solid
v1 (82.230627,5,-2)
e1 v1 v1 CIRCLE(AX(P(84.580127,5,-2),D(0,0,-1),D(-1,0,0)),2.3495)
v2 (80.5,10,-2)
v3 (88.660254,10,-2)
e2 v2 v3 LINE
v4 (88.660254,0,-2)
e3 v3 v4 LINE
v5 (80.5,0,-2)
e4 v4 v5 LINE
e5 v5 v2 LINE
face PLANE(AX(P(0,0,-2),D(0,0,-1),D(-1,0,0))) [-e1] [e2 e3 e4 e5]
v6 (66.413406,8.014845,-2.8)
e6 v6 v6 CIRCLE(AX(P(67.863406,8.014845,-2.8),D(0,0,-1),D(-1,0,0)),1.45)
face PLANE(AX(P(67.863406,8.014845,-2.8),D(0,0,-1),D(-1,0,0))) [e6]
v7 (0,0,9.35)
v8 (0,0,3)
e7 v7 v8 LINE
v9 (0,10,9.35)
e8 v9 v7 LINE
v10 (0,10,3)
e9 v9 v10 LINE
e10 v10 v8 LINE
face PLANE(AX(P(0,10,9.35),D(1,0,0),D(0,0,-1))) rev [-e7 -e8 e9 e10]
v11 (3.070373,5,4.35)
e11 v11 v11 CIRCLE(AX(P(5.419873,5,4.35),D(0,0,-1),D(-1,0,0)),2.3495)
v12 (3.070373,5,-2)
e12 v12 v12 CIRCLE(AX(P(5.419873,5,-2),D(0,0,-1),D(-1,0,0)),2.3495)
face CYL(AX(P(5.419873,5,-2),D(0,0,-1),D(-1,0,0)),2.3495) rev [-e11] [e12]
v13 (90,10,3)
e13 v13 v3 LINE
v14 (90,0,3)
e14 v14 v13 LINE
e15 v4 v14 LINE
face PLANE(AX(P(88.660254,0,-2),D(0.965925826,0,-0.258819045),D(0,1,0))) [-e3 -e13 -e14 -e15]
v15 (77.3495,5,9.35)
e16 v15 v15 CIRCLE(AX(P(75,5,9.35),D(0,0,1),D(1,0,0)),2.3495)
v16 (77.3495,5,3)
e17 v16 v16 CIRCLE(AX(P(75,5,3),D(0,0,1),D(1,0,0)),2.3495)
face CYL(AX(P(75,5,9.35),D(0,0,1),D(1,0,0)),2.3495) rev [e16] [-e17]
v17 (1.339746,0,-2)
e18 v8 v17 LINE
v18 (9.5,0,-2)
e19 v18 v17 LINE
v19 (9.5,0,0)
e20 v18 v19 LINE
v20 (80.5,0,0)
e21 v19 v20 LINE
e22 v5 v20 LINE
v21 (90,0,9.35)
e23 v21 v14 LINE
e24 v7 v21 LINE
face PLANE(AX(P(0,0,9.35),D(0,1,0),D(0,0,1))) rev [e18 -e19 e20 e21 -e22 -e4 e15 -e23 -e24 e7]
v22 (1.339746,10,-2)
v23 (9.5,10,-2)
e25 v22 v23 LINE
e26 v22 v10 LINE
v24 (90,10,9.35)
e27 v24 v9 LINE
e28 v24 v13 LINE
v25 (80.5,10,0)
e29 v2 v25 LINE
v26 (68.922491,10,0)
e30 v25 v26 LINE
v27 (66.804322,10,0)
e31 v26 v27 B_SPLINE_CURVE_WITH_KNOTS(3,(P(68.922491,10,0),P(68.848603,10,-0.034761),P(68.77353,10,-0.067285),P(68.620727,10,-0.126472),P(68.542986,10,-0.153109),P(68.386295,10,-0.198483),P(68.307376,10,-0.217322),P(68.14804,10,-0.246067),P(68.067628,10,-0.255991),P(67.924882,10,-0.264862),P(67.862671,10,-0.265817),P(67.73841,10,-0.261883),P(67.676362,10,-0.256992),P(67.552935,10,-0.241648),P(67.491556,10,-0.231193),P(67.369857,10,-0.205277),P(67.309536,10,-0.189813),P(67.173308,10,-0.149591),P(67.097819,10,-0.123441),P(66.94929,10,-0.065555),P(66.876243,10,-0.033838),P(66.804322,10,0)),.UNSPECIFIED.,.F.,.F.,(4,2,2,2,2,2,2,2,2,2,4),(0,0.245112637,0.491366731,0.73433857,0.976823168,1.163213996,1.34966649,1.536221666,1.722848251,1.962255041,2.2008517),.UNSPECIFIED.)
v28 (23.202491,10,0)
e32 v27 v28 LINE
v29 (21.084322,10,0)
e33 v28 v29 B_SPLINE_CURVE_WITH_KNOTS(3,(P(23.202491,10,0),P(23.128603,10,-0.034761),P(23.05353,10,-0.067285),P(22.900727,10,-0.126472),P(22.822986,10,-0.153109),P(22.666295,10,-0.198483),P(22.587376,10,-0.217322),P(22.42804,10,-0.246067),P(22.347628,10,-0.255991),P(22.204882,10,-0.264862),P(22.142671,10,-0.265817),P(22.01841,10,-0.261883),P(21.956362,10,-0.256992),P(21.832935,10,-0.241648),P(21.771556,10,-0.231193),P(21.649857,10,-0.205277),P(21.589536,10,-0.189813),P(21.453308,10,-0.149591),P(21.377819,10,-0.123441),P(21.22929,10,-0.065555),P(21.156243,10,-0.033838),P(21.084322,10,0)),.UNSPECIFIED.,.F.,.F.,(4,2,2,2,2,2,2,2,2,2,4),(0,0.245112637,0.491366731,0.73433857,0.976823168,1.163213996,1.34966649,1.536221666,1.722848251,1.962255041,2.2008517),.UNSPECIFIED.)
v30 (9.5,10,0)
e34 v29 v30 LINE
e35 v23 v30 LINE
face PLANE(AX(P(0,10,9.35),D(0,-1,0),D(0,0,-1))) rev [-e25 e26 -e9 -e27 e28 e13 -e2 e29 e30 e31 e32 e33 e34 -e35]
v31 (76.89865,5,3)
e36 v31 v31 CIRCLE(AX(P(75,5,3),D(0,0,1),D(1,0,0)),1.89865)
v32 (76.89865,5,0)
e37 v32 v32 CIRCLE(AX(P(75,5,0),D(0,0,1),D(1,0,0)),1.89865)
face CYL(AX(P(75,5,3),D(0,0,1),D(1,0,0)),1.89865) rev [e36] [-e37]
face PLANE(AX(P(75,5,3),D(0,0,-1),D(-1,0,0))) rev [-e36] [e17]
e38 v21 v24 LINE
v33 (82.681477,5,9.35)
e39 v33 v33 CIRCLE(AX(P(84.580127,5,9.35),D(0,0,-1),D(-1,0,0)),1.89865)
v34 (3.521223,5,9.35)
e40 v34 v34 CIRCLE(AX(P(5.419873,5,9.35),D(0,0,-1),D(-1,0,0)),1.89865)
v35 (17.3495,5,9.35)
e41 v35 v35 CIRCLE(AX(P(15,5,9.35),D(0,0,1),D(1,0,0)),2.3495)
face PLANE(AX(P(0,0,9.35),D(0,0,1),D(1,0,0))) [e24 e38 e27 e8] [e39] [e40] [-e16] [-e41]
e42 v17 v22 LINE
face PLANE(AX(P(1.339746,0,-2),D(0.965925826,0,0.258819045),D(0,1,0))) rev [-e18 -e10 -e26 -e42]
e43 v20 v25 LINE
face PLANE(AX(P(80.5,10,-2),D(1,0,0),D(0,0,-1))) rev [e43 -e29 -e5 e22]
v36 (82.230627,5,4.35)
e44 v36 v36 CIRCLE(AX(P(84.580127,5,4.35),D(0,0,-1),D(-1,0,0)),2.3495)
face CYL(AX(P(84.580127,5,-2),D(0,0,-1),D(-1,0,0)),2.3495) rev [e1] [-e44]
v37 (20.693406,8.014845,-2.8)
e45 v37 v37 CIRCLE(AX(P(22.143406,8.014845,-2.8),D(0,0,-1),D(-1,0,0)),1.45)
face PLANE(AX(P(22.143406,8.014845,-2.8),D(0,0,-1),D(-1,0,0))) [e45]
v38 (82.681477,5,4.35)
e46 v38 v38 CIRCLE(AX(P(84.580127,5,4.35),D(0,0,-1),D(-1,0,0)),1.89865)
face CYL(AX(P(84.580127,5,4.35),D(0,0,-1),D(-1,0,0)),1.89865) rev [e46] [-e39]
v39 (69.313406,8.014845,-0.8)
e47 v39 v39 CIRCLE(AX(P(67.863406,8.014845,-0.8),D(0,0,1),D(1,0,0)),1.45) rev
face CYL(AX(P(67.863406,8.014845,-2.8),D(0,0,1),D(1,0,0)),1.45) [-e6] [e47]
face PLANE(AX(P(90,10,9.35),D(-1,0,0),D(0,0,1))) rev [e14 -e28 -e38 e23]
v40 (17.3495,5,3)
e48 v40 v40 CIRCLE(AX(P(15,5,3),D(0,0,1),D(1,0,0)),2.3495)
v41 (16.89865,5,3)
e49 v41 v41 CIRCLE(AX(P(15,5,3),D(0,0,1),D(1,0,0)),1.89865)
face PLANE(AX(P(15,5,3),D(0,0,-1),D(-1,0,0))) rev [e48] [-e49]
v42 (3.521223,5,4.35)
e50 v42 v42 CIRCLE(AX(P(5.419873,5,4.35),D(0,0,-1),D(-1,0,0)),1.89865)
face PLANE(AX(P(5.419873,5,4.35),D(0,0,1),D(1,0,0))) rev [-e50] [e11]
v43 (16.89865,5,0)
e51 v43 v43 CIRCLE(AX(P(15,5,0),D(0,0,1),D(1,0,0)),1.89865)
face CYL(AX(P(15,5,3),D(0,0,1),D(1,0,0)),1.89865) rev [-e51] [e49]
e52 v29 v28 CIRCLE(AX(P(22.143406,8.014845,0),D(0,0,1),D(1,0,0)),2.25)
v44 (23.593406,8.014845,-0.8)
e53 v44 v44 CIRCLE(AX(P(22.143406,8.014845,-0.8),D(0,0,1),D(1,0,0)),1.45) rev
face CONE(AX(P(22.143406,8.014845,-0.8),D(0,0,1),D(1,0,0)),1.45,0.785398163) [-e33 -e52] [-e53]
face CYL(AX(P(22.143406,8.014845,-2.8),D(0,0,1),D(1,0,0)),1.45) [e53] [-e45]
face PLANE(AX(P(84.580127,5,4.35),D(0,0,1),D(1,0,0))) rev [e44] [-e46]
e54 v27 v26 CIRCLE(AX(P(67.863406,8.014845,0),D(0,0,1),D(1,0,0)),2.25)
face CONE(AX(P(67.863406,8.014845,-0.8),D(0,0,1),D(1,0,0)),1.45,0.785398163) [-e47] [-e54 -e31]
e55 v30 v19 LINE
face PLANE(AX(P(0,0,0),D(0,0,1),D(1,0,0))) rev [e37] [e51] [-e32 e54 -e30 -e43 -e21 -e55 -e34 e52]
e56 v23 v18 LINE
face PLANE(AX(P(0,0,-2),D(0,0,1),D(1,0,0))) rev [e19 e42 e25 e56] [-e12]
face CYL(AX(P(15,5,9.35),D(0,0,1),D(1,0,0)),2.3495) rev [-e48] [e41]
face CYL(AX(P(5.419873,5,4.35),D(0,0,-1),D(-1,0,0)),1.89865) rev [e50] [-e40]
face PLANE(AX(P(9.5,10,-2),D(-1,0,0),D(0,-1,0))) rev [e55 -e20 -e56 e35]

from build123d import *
from OCP.BRepFilletAPI import BRepFilletAPI_MakeChamfer

# Parameters (mm, degrees)
SKETCH2_W                       = 90
SKETCH2_H                       = 10
BOSS_EXTRUDE1_DEPTH             = 9.35
SKETCH4_W                       = 9.5
SKETCH4_H                       = 10
BOSS_EXTRUDE2_DEPTH             = 2
SKETCH5_R                       = 1.45
BOSS_EXTRUDE3_DEPTH             = 2.8
CHAMFER1_SIZE                   = 0.8
CHAMFER2_SIZE                   = 5
CHAMFER2_SIZE2                  = 1.339745962
F_13_0_185_DIAMETER_HOLE1_D     = 4.699
F_13_0_185_DIAMETER_HOLE1_DEPTH = 6.35
F_6_CLEARANCE_HOLE1_D           = 3.7973
F_6_CLEARANCE_HOLE1_ON_FACE_2_D = 3.7973
F_13_0_185_DIAMETER_HOLE2_D     = 4.699
F_13_0_185_DIAMETER_HOLE2_DEPTH = 6.35
F_6_CLEARANCE_HOLE2_D           = 3.7973


with BuildPart() as part:
    # Sketch2 → Boss-Extrude1 (new body)
    with BuildSketch(Plane.XY):
        with Locations((45, 5)):
            Rectangle(SKETCH2_W, SKETCH2_H)
    extrude(amount=BOSS_EXTRUDE1_DEPTH)

    # Sketch4 → Boss-Extrude2 (add)
    with BuildSketch(Plane(origin=(0, 0, 0), x_dir=(-1, 0, 0), z_dir=(0, 0, -1))):
        with Locations((-4.75, 5)):
            Rectangle(SKETCH4_W, SKETCH4_H)
        with Locations((-85.25, 5)):
            Rectangle(SKETCH4_W, SKETCH4_H)
    extrude(amount=BOSS_EXTRUDE2_DEPTH)

    # Sketch5 → Boss-Extrude3 (add)
    with BuildSketch(Plane(origin=(0, 0, 0), x_dir=(-1, 0, 0), z_dir=(0, 0, -1))):
        with Locations(Location((-67.863406388, 8.0148451, 0), (0, 0, 180))):
            Circle(SKETCH5_R)
        with Locations(Location((-22.143406388, 8.0148451, 0), (0, 0, 180))):
            Circle(SKETCH5_R)
    extrude(amount=BOSS_EXTRUDE3_DEPTH)

    # Chamfer1
    # the kernel refuses this chamfer: 0.8 mm, written as the material it adds along each edge
    with BuildSketch(Plane(origin=(67.863406388, 8.0148451, 0), x_dir=(1, 0, 0), z_dir=(0, 1, 0))) as chamfer1_piece_1_section:
        Polygon((1.45 + CHAMFER1_SIZE, 0), (1.45, CHAMFER1_SIZE), (1.45, 0), align=None)
    chamfer1_piece_1 = revolve(axis=Axis((67.863406388, 8.0148451, 0), (0, 0, -1)), mode=Mode.PRIVATE)
    chamfer1_piece_1 = split(chamfer1_piece_1, bisect_by=Plane(origin=(66.024382204, 10, -0.389024184), z_dir=(0, -1, 0)), keep=Keep.TOP, mode=Mode.PRIVATE)
    add(chamfer1_piece_1)
    with BuildSketch(Plane(origin=(22.143406388, 8.0148451, 0), x_dir=(1, 0, 0), z_dir=(0, 1, 0))) as chamfer1_piece_2_section:
        Polygon((1.45 + CHAMFER1_SIZE, 0), (1.45, CHAMFER1_SIZE), (1.45, 0), align=None)
    chamfer1_piece_2 = revolve(axis=Axis((22.143406388, 8.0148451, 0), (0, 0, -1)), mode=Mode.PRIVATE)
    chamfer1_piece_2 = split(chamfer1_piece_2, bisect_by=Plane(origin=(20.304382204, 10, -0.389024184), z_dir=(0, -1, 0)), keep=Keep.TOP, mode=Mode.PRIVATE)
    add(chamfer1_piece_2)

    # Chamfer2: one chamfer whose edges measure the first distance from different faces: ONE call of the kernel's chamfer builder (chamfer() names one face for all edges)
    chamfer2_edges_1 = [part.edges().sort_by_distance(p)[0] for p in [
        (0, 5, -2),
    ]]
    chamfer2_side_1 = [part.faces().sort_by_distance(p)[0] for p in [
        (0, 5, 3.675),
    ]]
    chamfer2_edges_2 = [part.edges().sort_by_distance(p)[0] for p in [
        (90, 5, -2),
    ]]
    chamfer2_side_2 = [part.faces().sort_by_distance(p)[0] for p in [
        (90, 5, 3.675),
    ]]
    chamfer2 = BRepFilletAPI_MakeChamfer(part.part.solid().wrapped)
    for e in chamfer2_edges_1:
        chamfer2.Add(CHAMFER2_SIZE, CHAMFER2_SIZE2, e.wrapped, chamfer2_side_1[0].wrapped)  # the first distance lies on this face
    for e in chamfer2_edges_2:
        chamfer2.Add(CHAMFER2_SIZE, CHAMFER2_SIZE2, e.wrapped, chamfer2_side_2[0].wrapped)  # the first distance lies on this face
    add(Compound.cast(chamfer2.Shape()), mode=Mode.REPLACE)

    # #13 (0.185) Diameter Hole1
    with Locations(Plane(origin=(84.580127019, 5, -2), x_dir=(-1, 0, 0), z_dir=(0, 0, -1))):
        with Locations((0, 0), (79.160254038, 0)):
            Hole(F_13_0_185_DIAMETER_HOLE1_D / 2, depth=F_13_0_185_DIAMETER_HOLE1_DEPTH)

    # #6 Clearance Hole1 (through all)
    with Locations(Plane(origin=(84.580127019, 5, 4.35), x_dir=(-1, 0, 0), z_dir=(0, 0, -1))):
        with Locations((0, 0), (79.160254038, 0)):
            Hole(F_6_CLEARANCE_HOLE1_D / 2)

    # #6 Clearance Hole1 on face 2 (through all)
    with Locations(Plane(origin=(5.419872981, 5, 0), x_dir=(-1, 0, 0), z_dir=(0, 0, -1))):
        with Locations((0, 0)):
            Hole(F_6_CLEARANCE_HOLE1_ON_FACE_2_D / 2)

    # #13 (0.185) Diameter Hole2
    with Locations(Plane(origin=(75, 5, 9.35), x_dir=(1, 0, 0), z_dir=(0, 0, 1))):
        with Locations((0, 0), (-60, 0)):
            Hole(F_13_0_185_DIAMETER_HOLE2_D / 2, depth=F_13_0_185_DIAMETER_HOLE2_DEPTH)

    # #6 Clearance Hole2 (through all)
    with Locations(Plane(origin=(75, 5, 3), x_dir=(1, 0, 0), z_dir=(0, 0, 1))):
        with Locations((0, 0), (-60, 0)):
            Hole(F_6_CLEARANCE_HOLE2_D / 2)


solid = part.part
